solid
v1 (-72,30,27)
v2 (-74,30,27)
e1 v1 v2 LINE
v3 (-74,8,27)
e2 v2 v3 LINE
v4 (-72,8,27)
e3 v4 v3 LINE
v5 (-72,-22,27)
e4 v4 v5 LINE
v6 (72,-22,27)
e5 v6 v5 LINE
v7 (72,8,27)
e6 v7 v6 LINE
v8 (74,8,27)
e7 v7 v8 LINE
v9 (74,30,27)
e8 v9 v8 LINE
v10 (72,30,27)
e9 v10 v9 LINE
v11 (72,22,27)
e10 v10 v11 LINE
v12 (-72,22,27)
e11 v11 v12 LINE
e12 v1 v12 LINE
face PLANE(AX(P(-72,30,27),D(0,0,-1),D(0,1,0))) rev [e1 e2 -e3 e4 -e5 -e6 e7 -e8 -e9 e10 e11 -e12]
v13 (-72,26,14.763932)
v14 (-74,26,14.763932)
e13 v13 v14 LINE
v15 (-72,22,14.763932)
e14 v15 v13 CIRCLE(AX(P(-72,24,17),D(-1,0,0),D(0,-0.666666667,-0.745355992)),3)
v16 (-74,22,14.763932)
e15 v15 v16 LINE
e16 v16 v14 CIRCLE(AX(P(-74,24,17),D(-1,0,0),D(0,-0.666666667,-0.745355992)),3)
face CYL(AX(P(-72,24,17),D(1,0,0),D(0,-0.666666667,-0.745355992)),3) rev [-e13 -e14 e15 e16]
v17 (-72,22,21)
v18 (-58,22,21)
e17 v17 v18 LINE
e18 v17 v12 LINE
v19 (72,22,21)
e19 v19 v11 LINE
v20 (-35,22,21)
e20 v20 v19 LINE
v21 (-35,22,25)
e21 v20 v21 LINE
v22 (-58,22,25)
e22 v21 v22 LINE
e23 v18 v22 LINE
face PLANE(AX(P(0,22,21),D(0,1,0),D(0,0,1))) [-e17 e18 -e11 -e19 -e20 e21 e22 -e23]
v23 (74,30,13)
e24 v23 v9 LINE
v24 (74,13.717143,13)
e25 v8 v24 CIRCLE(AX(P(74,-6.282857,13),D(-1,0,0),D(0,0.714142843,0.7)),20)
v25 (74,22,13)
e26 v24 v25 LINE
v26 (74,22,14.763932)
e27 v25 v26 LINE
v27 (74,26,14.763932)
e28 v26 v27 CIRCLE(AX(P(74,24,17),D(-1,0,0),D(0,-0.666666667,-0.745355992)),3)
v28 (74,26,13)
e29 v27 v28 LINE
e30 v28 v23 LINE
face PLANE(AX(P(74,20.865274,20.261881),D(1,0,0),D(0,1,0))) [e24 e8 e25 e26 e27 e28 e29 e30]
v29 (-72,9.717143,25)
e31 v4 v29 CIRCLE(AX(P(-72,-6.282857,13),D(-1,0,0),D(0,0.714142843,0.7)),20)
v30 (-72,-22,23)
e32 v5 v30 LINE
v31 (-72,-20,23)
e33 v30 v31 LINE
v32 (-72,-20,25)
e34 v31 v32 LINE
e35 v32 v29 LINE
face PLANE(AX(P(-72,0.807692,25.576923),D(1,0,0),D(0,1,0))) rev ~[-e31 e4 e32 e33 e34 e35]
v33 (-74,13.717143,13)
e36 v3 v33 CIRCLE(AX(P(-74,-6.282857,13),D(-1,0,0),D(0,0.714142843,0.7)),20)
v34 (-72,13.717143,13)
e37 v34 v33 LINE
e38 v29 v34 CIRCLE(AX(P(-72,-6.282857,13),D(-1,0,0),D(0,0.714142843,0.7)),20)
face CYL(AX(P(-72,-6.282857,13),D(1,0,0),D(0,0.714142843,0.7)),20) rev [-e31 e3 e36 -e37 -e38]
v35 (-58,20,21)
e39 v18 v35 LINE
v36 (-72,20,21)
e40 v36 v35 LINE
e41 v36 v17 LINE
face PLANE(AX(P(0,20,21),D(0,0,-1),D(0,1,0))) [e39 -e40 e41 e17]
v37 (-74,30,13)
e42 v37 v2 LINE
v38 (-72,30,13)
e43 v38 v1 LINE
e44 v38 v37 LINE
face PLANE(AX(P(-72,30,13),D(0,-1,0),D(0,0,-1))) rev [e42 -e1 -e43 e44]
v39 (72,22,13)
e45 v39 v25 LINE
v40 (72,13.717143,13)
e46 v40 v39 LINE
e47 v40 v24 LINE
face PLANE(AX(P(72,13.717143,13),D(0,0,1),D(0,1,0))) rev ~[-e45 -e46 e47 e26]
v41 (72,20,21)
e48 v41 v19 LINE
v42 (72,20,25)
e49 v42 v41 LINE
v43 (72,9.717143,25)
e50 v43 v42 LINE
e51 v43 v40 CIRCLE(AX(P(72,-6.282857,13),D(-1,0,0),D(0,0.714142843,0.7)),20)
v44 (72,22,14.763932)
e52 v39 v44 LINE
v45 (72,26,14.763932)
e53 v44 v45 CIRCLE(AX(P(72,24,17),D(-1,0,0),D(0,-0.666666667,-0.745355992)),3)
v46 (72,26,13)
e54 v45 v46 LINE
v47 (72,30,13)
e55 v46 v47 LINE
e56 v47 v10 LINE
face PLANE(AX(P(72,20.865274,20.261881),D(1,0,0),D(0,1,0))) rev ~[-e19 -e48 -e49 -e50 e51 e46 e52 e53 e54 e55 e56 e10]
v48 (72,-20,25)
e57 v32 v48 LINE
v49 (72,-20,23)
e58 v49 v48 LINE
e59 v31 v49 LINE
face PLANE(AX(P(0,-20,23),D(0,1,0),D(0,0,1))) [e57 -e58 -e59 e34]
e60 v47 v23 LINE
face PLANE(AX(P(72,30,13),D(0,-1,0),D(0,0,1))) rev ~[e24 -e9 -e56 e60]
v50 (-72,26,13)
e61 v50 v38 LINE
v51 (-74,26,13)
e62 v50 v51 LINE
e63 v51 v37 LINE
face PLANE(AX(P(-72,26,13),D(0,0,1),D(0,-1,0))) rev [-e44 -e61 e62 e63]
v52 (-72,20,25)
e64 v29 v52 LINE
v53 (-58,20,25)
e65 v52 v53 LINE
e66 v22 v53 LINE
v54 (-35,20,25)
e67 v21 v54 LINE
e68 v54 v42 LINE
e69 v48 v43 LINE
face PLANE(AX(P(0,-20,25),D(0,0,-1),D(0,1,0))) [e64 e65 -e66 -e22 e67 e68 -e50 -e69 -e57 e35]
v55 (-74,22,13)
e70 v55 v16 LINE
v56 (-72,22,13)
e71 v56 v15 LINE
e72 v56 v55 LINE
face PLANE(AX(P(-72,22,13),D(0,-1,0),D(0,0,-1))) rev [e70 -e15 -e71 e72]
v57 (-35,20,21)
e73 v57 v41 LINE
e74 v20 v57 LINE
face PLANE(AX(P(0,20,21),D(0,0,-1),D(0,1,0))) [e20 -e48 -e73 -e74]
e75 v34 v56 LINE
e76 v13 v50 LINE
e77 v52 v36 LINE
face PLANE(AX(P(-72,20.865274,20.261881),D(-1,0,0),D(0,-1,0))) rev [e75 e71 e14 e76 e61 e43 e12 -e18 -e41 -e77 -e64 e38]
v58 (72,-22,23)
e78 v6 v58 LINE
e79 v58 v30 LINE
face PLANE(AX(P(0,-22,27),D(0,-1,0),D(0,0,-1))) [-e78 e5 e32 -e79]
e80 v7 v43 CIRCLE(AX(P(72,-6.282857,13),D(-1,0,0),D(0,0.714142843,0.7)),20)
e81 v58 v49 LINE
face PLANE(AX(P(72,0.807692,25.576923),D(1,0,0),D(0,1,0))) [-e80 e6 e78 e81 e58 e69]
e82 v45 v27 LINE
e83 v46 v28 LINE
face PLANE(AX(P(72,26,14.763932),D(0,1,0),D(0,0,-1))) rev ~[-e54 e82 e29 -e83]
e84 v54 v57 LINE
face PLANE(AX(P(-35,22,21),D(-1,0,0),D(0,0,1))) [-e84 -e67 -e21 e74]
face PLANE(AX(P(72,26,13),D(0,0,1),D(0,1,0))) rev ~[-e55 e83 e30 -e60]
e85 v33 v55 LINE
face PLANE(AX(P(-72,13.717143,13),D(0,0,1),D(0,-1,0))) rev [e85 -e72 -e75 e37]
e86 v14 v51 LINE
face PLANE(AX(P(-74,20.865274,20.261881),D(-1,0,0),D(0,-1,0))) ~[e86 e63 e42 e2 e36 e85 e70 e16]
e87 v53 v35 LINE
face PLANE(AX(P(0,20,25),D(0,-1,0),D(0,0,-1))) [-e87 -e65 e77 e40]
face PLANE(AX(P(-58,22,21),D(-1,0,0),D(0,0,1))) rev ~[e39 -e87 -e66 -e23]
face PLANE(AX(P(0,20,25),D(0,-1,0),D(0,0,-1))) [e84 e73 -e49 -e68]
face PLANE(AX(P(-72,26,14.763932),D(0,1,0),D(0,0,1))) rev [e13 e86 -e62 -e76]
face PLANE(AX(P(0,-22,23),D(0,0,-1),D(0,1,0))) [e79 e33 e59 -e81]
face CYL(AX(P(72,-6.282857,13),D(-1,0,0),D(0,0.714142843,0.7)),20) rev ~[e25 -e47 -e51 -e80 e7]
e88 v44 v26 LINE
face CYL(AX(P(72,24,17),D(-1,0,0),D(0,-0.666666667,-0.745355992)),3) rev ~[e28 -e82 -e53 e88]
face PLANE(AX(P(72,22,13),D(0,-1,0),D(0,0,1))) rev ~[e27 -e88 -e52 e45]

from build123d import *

# Parameters (mm, degrees)
F1_DEPTH = 72
F3_DEPTH = 2
F4_W     = 23
F4_H     = 4
F5_DEPTH = 25


# Not quite as in the source:
# - a pattern or mirror of a feature is missing from the dataset's text; its kind, count and spacing are read off the source's solid


with BuildPart() as f1:
    # F0 (on Right) → F1 (new body, symmetric)
    with BuildSketch(Plane.YZ):
        Polygon((-22, 23), (-20, 23), (-20, 25), (20, 25), (20, 21), (22, 21), (22, 27), (-22, 27), align=None)
    extrude(amount=F1_DEPTH, both=True)

    # F2 (on face) → F3 (join)
    with BuildSketch(Plane.YZ.offset(72)):
        with BuildLine():
            Line((30, 27), (22, 27))
            Line((22, 27), (8, 27))
            ThreePointArc((8, 27), (12.2327735284, 20.5611792354), (13.7171431429, 13))
            Line((13.7171431429, 13), (22, 13))
            Line((22, 13), (22, 14.7639320225))
            ThreePointArc((22, 14.7639320225), (24, 20), (26, 14.7639320225))
            Line((26, 14.7639320225), (26, 13))
            Line((26, 13), (30, 13))
            Line((30, 13), (30, 27))
        make_face()
    f3 = extrude(amount=F3_DEPTH)

    # F3_copies: F3 across plane
    add(f3.mirror(Plane(origin=(0, 0, 0), x_dir=(0, 0, -1), z_dir=(-1, 0, 0))))

    # F4 (on face) → F5 (cut)
    with BuildSketch(Plane(origin=(0, 22, 0), x_dir=(-1, 0, 0), z_dir=(0, 1, 0))):
        with Locations((46.5, 23)):
            Rectangle(F4_W, F4_H)
    extrude(amount=-F5_DEPTH, mode=Mode.SUBTRACT)


solid = f1.part
